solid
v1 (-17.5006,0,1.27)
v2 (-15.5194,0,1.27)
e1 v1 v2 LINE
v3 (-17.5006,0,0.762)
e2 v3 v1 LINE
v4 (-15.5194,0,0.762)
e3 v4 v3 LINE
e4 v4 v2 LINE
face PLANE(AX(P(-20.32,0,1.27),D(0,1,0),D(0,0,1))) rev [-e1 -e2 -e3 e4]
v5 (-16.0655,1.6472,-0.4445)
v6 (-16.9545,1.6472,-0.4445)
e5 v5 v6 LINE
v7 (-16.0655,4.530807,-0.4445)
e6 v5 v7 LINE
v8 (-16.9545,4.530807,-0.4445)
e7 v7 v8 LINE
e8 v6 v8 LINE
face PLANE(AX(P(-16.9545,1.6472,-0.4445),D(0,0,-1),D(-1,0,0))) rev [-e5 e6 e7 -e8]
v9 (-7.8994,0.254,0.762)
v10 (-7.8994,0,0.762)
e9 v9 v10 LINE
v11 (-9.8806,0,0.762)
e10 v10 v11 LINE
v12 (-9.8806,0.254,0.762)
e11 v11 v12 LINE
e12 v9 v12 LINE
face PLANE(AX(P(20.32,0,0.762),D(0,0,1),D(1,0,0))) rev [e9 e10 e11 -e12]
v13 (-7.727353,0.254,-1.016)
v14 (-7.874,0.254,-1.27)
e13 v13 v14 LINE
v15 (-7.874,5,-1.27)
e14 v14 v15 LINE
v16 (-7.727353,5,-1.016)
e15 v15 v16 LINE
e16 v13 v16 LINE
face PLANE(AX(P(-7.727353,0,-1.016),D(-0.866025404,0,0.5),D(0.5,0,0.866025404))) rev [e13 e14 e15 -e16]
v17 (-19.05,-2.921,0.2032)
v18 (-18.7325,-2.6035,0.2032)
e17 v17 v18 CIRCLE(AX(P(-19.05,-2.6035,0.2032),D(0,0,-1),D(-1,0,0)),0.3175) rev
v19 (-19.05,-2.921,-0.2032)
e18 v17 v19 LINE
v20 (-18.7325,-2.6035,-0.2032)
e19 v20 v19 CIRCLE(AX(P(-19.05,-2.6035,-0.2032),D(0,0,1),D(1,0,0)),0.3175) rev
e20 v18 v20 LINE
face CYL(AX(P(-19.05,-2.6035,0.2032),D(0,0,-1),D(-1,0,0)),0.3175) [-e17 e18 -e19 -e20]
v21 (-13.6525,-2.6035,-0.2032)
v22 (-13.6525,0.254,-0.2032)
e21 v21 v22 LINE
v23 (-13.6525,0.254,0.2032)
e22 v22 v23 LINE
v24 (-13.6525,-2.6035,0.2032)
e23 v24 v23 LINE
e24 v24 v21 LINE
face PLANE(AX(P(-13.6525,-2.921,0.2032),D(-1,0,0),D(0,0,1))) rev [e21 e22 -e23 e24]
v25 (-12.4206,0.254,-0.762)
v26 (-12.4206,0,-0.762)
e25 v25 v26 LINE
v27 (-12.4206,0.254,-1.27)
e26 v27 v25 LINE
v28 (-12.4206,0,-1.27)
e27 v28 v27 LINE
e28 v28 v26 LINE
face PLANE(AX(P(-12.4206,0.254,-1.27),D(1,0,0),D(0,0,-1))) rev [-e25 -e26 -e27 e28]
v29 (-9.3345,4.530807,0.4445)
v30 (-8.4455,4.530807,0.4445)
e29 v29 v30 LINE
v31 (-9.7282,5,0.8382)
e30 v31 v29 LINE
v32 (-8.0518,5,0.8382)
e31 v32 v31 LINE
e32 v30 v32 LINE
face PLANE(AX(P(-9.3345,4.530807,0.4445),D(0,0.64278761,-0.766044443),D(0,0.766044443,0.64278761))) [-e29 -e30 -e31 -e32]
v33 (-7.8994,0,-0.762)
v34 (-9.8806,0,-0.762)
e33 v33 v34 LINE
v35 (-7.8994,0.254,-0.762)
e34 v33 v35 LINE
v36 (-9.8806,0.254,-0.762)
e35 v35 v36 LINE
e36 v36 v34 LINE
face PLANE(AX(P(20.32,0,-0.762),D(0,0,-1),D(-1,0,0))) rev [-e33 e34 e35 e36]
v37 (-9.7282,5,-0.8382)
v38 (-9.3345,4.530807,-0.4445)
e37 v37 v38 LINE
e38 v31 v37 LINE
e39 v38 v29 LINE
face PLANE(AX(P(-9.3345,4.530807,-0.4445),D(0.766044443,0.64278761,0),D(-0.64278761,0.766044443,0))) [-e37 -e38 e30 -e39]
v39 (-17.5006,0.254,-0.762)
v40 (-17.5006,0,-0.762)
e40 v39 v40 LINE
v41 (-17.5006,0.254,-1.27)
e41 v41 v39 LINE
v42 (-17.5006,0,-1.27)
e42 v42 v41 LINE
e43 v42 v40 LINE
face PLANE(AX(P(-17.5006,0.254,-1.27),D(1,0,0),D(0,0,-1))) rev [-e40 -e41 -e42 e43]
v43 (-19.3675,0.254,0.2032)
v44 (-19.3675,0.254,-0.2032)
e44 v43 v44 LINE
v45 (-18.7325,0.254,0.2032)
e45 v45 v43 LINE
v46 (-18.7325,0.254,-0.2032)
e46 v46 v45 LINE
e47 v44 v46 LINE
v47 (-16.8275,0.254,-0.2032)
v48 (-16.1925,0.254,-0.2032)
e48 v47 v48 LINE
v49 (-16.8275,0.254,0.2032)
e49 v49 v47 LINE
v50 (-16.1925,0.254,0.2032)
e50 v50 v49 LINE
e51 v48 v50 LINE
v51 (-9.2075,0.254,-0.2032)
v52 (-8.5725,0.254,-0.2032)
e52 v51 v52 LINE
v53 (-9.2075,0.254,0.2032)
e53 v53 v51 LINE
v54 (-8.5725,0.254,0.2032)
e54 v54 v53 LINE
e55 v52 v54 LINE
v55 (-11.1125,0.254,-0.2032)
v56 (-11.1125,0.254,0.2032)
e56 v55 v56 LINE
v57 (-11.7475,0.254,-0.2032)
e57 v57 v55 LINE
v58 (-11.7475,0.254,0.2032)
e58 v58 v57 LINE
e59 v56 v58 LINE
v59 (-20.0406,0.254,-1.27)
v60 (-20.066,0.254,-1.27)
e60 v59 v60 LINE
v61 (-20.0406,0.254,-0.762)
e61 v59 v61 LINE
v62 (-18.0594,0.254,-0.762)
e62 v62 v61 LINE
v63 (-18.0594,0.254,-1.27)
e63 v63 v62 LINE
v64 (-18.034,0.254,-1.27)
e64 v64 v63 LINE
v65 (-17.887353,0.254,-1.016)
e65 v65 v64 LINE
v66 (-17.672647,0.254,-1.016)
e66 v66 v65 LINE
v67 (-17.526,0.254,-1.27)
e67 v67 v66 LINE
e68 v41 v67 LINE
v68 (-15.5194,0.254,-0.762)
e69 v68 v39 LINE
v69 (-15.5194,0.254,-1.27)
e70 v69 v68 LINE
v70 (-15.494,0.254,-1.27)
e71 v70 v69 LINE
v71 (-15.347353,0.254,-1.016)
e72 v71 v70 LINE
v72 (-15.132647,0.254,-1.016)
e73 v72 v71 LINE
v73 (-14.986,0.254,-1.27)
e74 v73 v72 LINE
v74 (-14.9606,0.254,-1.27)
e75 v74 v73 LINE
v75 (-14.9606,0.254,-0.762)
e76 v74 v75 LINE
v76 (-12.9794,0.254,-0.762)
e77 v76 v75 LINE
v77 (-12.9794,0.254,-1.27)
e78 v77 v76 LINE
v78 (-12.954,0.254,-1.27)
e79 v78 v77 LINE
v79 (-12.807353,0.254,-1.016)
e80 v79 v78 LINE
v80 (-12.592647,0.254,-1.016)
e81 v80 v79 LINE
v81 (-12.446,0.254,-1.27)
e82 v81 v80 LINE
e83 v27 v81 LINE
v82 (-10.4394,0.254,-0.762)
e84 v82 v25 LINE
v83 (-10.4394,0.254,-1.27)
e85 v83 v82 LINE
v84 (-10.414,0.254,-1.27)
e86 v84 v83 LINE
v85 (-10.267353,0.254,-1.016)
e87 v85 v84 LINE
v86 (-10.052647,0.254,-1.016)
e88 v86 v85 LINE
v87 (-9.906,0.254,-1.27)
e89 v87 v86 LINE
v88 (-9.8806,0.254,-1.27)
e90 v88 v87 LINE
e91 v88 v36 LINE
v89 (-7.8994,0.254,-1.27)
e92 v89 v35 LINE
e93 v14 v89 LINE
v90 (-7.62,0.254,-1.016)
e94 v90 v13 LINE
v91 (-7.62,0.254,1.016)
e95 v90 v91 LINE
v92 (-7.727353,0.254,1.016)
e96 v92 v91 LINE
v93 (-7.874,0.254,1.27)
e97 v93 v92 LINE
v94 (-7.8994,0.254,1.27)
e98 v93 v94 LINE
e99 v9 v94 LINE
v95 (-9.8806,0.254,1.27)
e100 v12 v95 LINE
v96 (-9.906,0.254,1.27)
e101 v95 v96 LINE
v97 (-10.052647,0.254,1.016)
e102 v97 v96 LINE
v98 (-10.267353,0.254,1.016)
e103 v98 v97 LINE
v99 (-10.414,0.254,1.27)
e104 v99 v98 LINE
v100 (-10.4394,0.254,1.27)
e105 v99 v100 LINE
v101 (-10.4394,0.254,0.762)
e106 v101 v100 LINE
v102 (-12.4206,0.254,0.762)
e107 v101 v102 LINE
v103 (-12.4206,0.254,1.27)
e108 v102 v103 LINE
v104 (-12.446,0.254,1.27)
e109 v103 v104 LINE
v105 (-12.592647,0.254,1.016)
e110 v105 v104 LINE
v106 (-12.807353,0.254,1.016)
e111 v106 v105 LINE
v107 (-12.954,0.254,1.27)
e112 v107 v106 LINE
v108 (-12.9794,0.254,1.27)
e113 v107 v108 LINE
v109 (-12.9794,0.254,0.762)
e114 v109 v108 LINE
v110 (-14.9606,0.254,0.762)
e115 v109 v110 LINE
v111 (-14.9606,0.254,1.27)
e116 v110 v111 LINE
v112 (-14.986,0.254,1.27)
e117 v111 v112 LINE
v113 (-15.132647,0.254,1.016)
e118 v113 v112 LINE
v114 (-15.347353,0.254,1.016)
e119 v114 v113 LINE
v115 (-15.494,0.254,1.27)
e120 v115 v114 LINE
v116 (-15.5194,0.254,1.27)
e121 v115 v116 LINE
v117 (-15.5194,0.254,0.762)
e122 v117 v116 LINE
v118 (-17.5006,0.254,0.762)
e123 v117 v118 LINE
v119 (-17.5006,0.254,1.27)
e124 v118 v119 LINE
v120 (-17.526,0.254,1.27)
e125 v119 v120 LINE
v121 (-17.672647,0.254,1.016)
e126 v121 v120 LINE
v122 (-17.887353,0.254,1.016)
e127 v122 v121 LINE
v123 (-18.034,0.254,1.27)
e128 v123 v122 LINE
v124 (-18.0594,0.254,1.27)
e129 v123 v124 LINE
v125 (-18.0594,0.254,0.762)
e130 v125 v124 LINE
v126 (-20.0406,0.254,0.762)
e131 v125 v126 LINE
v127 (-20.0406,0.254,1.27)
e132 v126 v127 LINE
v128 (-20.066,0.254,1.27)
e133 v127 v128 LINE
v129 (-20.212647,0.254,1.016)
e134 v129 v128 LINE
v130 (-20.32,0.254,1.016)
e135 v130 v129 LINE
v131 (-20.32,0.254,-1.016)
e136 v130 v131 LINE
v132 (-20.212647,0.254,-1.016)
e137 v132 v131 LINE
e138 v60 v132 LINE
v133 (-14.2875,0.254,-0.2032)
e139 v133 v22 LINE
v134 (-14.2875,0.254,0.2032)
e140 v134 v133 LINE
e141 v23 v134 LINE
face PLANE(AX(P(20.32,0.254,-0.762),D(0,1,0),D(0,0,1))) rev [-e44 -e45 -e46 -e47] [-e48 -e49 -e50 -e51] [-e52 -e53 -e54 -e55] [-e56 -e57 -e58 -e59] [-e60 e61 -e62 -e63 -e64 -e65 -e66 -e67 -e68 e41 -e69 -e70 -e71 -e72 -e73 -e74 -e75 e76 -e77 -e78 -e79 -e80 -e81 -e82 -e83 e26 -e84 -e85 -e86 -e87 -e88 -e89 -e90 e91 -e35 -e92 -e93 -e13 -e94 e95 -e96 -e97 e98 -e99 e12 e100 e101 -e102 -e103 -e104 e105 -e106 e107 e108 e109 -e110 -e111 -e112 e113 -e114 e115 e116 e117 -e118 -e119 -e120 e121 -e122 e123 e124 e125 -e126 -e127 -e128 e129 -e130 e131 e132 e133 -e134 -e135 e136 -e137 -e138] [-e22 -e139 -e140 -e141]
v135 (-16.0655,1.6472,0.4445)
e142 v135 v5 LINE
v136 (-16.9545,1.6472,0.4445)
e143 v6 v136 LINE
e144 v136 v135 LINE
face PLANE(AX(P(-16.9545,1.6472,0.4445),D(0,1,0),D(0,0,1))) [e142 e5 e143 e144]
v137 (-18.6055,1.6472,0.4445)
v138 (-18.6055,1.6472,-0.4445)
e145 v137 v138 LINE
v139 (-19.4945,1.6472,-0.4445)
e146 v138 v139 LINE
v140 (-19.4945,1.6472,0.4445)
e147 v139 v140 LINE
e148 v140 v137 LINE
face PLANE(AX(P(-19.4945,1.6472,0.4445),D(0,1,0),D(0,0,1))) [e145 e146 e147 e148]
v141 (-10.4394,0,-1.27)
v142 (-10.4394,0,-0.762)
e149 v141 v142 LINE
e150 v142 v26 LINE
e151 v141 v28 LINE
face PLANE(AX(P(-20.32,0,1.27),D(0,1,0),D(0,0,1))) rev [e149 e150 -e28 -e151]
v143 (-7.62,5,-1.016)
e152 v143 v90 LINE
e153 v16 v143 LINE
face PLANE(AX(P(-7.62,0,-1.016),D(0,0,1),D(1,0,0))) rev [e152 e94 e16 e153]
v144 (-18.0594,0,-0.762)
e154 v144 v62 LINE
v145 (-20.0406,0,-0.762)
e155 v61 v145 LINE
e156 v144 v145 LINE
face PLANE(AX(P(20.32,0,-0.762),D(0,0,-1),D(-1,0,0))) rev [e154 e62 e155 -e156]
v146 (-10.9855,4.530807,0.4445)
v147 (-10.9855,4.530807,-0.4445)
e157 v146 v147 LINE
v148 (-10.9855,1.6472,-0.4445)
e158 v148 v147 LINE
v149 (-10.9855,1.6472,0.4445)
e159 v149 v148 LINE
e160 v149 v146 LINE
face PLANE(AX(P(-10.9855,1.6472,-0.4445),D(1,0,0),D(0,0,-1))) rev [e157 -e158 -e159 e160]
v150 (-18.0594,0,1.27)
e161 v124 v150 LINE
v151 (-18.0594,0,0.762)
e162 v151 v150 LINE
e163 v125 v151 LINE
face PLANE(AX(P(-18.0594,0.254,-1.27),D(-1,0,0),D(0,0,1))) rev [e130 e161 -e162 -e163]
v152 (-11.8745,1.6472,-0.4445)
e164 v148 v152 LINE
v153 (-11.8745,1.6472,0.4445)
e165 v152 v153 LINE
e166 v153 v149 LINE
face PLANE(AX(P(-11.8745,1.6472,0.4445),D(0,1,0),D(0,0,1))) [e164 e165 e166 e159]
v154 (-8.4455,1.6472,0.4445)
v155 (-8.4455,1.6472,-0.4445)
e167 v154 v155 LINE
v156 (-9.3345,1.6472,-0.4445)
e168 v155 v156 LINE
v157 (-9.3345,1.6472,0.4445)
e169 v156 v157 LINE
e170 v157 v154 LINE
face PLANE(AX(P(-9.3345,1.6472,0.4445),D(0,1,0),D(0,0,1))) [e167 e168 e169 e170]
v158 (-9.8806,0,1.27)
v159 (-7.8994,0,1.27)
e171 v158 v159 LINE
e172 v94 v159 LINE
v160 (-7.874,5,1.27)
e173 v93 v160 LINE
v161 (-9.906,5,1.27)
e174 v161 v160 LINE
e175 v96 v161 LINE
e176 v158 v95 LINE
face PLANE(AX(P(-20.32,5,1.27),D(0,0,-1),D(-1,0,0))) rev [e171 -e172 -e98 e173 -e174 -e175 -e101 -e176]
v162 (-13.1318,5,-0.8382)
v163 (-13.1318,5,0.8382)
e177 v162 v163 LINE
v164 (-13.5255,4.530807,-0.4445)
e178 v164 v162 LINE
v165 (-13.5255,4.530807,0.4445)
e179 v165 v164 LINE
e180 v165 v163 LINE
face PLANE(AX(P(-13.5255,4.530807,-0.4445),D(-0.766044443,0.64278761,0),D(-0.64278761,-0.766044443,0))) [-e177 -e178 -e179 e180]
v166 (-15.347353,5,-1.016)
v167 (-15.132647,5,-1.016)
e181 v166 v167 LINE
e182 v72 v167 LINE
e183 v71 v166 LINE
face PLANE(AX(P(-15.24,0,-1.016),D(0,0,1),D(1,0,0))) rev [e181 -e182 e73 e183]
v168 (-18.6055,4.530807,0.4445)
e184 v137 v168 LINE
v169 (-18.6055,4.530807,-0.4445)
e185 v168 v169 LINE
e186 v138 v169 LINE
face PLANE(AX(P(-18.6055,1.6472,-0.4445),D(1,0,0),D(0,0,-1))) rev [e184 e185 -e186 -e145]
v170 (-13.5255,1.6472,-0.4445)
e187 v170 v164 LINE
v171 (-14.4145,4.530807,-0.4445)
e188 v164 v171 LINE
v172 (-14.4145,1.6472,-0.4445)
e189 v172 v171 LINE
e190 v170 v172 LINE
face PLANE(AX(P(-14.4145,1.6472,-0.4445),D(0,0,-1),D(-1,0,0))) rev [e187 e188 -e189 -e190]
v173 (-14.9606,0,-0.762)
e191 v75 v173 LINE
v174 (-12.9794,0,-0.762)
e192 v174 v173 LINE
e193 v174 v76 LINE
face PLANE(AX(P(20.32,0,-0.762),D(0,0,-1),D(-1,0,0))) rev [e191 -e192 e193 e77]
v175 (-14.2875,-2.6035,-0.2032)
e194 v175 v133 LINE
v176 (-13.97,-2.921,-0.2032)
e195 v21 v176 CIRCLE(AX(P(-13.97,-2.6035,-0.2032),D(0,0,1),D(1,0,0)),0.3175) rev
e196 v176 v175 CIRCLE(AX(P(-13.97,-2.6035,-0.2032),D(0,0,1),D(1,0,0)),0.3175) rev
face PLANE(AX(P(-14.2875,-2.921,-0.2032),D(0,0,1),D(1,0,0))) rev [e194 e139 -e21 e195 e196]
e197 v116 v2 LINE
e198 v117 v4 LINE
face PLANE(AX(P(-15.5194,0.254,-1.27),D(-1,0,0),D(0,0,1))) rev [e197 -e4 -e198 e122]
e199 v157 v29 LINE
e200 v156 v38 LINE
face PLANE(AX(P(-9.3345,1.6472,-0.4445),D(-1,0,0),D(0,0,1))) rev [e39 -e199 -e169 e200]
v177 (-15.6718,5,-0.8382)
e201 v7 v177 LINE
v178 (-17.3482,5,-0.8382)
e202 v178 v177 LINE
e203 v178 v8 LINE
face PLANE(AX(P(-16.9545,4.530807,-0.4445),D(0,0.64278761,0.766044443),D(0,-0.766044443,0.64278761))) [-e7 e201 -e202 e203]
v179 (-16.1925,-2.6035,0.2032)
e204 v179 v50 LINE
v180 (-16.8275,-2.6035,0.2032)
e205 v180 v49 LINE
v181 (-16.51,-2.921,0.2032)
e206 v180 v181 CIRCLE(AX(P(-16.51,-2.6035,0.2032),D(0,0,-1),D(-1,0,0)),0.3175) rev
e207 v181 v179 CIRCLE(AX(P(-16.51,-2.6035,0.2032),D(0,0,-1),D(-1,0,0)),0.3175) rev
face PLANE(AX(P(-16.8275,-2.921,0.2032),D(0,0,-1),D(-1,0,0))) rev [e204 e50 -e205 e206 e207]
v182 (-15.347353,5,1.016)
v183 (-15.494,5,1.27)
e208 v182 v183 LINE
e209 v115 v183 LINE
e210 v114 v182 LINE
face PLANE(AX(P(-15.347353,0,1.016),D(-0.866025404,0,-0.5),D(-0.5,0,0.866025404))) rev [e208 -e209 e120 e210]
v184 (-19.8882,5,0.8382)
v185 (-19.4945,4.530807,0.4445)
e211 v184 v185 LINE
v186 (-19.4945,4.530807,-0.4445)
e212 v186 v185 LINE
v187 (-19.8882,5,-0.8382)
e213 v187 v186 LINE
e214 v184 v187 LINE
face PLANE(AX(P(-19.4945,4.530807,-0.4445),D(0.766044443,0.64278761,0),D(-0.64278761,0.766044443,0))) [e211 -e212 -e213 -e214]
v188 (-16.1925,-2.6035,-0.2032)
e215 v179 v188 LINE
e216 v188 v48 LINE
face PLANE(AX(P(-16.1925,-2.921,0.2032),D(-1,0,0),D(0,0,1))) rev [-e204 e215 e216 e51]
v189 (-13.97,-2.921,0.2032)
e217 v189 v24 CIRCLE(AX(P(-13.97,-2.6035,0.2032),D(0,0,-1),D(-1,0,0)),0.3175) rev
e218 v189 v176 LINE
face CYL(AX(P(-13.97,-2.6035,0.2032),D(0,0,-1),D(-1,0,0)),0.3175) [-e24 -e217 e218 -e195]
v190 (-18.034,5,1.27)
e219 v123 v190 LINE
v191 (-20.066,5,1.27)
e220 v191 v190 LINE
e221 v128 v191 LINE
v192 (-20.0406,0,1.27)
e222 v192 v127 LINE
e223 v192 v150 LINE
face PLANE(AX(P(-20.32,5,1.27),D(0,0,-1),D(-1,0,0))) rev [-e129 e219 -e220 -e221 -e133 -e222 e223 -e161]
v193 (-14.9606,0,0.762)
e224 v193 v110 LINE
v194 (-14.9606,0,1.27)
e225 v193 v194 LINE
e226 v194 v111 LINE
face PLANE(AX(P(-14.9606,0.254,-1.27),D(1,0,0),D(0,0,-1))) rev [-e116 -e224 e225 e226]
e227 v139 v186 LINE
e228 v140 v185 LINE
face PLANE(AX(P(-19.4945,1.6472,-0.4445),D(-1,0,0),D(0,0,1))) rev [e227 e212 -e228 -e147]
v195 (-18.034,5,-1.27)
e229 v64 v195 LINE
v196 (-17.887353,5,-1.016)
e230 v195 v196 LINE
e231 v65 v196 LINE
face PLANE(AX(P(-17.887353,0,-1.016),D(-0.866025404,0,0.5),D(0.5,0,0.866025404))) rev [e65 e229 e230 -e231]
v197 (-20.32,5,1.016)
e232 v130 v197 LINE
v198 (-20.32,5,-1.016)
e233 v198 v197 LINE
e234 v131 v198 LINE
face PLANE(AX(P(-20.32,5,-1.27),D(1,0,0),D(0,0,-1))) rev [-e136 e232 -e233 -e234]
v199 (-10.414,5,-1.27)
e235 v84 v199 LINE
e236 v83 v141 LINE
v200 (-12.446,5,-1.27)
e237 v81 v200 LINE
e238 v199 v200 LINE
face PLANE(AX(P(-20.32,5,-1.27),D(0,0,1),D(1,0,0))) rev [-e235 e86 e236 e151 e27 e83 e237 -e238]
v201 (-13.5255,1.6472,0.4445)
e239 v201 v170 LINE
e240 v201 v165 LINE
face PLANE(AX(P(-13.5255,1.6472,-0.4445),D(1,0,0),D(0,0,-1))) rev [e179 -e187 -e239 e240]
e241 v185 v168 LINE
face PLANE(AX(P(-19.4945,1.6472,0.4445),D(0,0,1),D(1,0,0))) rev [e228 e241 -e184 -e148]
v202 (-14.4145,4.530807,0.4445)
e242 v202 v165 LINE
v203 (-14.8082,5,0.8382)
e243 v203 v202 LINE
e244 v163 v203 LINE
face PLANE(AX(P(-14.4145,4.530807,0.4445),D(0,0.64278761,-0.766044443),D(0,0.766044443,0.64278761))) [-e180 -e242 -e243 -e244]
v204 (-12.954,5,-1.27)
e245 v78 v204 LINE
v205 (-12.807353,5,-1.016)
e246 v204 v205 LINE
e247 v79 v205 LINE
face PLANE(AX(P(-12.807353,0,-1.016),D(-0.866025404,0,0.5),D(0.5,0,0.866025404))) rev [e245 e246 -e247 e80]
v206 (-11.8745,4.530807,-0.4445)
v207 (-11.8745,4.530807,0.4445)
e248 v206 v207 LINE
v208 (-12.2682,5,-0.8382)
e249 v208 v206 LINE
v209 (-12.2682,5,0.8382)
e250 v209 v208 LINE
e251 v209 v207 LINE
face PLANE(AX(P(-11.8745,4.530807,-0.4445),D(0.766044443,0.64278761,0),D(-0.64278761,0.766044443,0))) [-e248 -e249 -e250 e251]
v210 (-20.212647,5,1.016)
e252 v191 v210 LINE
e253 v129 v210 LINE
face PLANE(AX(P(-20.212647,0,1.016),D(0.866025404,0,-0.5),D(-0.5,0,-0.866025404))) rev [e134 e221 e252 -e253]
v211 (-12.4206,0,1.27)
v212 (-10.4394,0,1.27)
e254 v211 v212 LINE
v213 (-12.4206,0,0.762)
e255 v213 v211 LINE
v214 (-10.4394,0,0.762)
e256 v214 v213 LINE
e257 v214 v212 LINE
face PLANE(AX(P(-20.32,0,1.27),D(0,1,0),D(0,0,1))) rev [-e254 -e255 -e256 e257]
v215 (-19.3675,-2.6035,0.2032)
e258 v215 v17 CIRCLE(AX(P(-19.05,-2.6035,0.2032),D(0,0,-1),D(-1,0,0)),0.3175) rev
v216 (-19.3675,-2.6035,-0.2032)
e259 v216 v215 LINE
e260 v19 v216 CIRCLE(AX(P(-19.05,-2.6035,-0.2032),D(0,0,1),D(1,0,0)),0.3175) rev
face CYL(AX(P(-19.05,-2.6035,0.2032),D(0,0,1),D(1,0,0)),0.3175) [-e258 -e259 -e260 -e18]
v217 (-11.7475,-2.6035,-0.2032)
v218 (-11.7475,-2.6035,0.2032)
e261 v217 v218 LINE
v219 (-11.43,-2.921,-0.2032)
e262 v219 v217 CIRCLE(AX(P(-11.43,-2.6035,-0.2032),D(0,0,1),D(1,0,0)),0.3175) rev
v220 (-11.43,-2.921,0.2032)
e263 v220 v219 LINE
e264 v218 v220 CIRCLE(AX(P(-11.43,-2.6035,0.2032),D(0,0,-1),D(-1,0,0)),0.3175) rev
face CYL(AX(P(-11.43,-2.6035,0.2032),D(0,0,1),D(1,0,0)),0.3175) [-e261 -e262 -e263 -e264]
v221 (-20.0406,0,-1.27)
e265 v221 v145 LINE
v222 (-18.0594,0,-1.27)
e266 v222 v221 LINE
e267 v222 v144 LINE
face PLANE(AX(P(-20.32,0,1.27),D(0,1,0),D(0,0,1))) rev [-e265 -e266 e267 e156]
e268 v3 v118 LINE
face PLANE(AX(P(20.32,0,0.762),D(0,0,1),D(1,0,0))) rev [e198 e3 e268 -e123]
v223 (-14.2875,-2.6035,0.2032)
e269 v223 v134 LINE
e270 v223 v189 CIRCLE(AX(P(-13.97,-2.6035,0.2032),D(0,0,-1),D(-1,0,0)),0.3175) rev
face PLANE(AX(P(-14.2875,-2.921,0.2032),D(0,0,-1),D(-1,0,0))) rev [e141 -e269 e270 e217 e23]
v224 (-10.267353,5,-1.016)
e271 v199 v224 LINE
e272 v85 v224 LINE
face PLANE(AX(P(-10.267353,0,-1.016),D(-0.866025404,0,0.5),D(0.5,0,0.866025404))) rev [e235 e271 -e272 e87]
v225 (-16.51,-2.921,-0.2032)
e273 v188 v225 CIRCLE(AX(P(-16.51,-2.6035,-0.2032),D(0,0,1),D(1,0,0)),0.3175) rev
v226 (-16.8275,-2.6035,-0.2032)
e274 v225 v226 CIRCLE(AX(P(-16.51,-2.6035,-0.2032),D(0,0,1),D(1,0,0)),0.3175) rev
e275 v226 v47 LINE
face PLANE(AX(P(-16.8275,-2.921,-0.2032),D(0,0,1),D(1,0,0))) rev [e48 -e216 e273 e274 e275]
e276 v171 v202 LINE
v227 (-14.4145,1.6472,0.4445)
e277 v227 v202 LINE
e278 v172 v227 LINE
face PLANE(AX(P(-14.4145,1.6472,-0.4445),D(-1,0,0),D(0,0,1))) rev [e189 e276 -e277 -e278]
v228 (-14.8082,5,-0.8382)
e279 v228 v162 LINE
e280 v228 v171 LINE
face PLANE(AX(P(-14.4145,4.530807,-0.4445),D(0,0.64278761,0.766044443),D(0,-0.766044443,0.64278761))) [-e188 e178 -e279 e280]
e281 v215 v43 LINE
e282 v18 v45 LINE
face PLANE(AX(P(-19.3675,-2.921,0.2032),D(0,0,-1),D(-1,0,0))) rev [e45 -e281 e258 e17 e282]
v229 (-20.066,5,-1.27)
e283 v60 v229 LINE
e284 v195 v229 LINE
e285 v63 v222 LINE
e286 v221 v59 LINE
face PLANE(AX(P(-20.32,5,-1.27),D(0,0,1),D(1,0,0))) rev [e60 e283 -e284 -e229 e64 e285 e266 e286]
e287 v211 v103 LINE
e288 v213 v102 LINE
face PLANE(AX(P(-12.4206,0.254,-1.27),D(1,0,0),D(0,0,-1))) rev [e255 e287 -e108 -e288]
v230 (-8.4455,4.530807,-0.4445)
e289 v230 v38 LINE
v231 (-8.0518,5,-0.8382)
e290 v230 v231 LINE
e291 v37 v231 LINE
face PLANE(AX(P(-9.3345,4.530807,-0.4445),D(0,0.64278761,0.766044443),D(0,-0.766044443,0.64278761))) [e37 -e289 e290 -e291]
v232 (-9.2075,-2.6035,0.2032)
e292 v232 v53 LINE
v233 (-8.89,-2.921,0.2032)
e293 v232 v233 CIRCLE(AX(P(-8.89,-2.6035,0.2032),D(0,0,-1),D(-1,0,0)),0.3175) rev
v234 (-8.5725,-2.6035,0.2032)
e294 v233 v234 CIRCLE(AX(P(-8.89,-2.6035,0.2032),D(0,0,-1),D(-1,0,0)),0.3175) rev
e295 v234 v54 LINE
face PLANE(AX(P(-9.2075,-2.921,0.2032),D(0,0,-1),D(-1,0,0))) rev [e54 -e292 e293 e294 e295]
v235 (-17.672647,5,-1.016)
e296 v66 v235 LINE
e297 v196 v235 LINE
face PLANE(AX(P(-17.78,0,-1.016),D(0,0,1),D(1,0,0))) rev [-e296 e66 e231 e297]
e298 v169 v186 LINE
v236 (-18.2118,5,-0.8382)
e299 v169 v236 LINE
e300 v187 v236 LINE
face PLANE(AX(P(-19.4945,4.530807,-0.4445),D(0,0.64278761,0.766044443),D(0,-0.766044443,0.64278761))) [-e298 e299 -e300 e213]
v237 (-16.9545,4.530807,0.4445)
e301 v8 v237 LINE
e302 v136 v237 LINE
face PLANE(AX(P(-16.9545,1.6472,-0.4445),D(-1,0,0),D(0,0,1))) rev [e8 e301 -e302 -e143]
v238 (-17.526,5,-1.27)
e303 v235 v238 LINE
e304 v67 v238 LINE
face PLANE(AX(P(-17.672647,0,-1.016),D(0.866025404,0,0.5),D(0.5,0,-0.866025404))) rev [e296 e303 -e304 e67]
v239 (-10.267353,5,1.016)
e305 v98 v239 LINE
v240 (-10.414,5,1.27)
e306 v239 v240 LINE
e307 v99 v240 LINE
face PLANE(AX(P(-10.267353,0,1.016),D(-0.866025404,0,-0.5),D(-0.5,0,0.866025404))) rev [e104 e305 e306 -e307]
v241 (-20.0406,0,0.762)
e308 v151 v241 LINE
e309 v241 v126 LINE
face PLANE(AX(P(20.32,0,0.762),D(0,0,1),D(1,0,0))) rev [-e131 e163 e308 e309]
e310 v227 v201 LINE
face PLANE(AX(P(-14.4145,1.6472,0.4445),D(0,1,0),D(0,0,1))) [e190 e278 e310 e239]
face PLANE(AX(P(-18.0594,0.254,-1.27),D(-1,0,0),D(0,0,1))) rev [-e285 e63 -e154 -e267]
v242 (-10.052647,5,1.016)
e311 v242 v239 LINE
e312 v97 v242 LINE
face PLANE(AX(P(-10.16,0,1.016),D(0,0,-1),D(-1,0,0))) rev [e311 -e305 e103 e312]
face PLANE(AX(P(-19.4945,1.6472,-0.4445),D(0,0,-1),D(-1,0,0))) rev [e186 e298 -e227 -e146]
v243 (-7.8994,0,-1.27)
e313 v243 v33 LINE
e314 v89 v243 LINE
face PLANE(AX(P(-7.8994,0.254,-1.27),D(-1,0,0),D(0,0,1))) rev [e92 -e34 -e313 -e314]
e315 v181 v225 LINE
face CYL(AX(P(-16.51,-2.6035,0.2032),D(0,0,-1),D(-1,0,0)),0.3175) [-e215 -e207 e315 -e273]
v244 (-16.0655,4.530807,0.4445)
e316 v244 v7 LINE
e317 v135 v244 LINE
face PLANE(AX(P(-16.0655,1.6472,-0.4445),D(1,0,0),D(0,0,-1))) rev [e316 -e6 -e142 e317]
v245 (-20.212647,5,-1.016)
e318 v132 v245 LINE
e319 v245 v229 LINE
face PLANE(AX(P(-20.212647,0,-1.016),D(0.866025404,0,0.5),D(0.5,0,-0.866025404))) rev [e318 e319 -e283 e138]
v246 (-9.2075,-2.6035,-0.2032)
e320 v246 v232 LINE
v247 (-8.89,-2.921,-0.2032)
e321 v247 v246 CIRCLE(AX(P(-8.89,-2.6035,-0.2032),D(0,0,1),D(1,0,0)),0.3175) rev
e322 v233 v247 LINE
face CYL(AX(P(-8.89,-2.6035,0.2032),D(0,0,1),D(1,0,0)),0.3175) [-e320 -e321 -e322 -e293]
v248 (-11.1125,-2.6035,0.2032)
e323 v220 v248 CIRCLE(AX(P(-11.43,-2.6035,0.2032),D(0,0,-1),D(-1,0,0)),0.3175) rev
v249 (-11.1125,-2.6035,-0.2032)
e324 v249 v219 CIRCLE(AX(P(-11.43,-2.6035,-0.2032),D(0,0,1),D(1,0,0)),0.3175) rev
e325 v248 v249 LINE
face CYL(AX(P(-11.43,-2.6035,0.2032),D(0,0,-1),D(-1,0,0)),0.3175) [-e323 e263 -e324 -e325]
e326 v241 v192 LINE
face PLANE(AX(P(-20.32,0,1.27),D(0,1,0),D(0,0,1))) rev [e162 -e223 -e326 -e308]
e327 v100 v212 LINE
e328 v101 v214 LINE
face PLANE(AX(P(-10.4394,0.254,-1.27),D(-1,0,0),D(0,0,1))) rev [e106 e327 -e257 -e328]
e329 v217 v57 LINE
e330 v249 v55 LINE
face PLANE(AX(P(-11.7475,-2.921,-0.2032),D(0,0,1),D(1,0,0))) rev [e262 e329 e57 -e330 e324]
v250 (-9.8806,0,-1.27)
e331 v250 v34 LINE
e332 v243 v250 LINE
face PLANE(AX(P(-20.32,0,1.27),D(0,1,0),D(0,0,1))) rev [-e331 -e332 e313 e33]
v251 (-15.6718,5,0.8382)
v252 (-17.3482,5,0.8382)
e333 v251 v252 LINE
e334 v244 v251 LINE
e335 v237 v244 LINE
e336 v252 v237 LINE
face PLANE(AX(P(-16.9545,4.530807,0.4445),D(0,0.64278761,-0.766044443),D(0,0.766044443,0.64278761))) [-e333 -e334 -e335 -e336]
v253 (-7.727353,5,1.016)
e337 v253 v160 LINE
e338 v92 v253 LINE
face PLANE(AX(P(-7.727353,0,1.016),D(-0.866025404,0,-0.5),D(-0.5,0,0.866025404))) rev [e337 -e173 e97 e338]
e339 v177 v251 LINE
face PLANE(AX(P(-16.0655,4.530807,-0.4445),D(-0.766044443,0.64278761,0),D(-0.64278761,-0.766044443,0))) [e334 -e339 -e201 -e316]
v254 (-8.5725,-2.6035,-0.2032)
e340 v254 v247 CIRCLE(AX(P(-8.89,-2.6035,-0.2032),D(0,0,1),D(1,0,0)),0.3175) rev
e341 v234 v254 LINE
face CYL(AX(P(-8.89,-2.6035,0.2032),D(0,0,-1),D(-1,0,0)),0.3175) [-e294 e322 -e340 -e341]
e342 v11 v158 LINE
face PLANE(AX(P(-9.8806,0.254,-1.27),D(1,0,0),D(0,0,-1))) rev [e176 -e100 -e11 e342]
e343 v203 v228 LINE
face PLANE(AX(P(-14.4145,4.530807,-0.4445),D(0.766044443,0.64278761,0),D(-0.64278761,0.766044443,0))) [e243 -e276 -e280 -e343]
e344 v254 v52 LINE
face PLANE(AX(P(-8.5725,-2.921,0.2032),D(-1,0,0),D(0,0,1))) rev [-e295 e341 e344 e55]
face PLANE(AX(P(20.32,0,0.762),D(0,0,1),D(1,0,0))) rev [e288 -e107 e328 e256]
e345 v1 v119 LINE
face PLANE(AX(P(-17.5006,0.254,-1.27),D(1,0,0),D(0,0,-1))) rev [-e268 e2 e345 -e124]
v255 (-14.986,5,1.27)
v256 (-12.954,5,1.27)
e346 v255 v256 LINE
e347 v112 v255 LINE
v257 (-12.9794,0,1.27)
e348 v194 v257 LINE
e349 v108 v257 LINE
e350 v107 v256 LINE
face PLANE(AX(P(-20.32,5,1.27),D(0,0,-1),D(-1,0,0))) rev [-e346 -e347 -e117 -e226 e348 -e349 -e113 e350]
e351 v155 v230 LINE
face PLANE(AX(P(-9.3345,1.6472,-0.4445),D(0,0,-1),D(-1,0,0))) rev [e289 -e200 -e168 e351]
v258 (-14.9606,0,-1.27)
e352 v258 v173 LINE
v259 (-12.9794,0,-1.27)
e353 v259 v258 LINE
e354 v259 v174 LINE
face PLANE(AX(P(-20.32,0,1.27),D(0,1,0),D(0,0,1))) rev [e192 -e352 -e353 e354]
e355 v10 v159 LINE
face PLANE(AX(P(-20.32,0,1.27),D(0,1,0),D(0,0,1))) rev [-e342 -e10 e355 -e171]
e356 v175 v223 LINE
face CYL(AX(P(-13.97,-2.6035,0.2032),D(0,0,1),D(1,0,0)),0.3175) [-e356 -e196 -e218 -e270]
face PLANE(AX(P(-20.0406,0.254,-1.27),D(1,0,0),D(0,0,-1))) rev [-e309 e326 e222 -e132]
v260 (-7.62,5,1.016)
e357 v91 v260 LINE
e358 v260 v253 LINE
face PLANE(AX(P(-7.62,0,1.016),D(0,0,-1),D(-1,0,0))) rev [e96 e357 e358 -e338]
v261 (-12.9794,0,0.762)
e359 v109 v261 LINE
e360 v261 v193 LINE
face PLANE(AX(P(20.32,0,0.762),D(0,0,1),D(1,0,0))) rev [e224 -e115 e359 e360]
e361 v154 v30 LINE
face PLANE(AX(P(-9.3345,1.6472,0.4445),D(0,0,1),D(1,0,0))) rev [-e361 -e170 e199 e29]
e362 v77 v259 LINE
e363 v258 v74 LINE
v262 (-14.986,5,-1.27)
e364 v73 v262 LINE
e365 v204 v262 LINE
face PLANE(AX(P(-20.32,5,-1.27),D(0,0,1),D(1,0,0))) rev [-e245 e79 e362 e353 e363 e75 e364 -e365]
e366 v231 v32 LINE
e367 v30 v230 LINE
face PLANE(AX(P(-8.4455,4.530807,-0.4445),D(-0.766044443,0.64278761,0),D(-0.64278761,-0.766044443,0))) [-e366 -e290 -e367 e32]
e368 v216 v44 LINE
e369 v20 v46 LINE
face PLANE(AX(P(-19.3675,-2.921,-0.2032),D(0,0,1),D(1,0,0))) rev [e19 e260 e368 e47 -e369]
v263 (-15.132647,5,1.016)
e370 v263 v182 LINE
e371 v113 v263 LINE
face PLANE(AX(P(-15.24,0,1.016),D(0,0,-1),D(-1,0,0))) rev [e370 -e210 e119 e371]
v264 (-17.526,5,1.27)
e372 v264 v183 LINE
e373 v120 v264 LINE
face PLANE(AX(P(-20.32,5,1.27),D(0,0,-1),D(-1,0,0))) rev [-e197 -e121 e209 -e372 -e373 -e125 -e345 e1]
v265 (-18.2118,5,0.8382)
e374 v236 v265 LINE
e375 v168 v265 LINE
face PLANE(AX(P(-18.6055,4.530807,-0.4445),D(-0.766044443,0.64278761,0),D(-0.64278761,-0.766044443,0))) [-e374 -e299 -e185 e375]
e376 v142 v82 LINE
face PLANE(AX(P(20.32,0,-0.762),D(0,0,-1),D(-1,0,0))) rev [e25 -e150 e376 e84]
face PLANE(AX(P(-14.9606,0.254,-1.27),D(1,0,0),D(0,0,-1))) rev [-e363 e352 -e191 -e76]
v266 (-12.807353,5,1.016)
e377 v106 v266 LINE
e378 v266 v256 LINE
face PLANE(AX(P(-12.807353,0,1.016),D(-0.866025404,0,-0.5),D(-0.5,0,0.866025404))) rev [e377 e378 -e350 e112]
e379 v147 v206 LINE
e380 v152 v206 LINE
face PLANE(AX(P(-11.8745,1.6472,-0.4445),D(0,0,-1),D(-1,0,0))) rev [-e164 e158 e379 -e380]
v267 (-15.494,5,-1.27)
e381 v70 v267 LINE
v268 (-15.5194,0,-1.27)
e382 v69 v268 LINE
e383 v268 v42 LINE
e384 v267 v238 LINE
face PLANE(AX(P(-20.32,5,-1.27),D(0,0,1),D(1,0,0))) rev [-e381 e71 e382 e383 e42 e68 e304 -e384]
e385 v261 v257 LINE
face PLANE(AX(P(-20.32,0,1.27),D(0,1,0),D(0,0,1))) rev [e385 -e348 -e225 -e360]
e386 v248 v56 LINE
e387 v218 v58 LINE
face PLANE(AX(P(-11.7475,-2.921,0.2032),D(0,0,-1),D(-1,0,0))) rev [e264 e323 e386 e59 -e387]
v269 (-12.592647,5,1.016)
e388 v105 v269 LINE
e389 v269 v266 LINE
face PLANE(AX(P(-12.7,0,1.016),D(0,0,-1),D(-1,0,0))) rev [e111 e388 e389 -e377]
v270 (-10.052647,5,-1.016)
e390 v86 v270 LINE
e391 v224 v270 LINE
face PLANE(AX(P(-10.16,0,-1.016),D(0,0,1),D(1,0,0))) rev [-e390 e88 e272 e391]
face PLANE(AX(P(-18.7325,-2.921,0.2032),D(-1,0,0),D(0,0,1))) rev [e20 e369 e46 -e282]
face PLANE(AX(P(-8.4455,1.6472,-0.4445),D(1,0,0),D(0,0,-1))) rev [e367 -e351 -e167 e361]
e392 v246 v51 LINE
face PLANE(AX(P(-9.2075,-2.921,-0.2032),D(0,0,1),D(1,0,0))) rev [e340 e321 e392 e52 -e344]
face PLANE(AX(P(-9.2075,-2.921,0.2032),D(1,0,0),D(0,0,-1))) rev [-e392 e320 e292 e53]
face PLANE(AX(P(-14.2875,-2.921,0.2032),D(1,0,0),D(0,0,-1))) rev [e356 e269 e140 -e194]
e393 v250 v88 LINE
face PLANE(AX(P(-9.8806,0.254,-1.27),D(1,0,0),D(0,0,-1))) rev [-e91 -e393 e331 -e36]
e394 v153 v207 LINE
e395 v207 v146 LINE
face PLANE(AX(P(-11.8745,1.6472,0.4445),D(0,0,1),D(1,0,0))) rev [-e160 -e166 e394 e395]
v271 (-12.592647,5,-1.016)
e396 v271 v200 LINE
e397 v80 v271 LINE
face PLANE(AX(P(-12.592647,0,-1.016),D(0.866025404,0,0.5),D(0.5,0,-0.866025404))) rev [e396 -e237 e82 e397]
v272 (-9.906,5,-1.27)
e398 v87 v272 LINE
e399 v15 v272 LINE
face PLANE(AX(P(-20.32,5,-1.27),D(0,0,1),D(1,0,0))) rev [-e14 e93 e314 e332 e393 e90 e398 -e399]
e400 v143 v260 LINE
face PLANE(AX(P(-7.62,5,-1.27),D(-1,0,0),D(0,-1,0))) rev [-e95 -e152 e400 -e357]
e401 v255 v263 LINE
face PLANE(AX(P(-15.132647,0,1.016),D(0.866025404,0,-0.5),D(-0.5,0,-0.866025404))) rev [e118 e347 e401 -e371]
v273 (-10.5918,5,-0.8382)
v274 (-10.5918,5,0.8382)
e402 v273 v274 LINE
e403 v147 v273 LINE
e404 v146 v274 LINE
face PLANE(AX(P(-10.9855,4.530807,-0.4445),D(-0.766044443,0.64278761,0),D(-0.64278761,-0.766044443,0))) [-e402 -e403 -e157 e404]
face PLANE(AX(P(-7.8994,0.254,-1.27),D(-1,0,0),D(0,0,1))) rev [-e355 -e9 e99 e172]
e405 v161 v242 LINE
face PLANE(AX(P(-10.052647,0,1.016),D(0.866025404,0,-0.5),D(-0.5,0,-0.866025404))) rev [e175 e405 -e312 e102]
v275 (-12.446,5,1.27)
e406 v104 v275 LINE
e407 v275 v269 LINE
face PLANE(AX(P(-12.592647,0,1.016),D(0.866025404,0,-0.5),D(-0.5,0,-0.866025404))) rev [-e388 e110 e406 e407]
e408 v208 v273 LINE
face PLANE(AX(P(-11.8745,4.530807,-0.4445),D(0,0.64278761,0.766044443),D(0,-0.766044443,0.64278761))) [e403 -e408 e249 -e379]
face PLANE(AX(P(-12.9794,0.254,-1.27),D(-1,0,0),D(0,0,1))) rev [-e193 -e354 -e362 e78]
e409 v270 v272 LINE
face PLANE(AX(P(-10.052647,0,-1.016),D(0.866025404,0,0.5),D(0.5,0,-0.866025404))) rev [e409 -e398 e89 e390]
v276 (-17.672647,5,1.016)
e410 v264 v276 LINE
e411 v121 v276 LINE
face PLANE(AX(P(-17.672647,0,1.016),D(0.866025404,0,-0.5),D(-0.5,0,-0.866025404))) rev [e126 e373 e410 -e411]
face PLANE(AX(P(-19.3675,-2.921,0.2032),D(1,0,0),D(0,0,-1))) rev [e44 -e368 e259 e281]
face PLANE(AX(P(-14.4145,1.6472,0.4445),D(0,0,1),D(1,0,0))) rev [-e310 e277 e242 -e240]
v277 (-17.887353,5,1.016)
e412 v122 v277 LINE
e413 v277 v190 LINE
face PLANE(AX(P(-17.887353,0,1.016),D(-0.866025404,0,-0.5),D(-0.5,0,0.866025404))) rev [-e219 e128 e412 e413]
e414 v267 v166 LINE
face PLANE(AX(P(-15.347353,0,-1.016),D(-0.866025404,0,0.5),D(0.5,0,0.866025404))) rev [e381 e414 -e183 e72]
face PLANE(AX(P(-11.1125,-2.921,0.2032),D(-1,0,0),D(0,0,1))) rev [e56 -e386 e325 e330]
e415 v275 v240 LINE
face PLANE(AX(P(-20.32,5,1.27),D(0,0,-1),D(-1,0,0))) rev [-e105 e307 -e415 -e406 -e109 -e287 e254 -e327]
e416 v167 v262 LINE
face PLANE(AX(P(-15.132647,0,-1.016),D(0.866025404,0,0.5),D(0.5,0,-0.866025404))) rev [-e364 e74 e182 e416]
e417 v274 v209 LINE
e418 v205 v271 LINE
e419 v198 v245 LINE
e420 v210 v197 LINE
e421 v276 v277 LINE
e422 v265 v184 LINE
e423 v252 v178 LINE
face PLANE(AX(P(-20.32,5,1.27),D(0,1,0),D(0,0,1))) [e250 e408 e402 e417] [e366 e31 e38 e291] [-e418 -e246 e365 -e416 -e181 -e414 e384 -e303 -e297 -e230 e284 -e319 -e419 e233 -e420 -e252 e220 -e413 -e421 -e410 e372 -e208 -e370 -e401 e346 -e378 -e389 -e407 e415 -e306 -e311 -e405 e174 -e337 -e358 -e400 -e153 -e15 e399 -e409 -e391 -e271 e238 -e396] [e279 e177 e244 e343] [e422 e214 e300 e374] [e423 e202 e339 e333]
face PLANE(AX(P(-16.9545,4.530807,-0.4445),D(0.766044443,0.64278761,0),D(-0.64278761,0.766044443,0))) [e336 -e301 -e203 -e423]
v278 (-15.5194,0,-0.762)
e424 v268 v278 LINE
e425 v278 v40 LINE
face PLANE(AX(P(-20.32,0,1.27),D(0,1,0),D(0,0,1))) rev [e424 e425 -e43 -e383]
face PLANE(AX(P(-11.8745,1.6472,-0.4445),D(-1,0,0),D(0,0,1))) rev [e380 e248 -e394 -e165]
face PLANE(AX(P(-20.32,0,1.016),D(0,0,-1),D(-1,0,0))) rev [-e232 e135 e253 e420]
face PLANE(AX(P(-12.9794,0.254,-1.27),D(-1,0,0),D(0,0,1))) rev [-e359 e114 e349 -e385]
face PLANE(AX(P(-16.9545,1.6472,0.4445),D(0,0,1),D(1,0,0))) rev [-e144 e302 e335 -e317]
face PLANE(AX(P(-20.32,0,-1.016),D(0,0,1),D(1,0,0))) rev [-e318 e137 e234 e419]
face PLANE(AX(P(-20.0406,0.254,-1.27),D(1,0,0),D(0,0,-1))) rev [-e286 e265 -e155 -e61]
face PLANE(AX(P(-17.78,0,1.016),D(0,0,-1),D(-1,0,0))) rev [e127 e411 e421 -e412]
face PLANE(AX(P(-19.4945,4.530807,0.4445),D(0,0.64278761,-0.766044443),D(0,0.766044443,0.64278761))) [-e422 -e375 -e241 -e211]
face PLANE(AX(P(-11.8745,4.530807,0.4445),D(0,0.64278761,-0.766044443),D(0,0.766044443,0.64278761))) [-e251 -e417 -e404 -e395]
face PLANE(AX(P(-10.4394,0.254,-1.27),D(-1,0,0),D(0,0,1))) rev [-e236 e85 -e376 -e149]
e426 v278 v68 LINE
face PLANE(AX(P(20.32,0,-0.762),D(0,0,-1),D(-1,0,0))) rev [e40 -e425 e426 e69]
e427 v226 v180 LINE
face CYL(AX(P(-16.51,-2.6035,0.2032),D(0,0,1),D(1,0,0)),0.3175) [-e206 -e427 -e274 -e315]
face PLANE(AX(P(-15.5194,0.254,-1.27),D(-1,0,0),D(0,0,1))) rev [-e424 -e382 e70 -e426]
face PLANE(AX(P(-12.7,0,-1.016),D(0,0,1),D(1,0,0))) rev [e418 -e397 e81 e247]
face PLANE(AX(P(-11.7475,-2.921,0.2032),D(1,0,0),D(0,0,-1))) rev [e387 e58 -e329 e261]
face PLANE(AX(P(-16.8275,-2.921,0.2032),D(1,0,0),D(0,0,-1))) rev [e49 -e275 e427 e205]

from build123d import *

# Parameters (mm, degrees)
SKETCH1_W                      = 40.64
SKETCH1_H                      = 2.54
BASE_EXTRUDE_DEPTH             = 5
SKETCH2_W                      = 1.524
SKETCH2_H                      = 0.254
STANDOFF_WIDTH_DEPTH           = 41.966114046
UPPER_START                    = -19.4945
UPPER_CORE_OUTLINE_W           = 3.3528
UPPER_CORE_OUTLINE_H           = 0.889
UPPER_CORE_DEPTH               = 0.889
LEAD_IN_SIZE                   = 0.3937
LEAD_IN_SIZE2                  = 0.469193389
CORE_PATTERN_COUNT             = 16
CORE_PATTERN_PITCH             = 2.54
LEAD_IN_OF_CORE_PATTERN_SIZE2  = 0.469193389
LEAD_IN_OF_CORE_PATTERN_SIZE   = 0.3937
POSITION_CUT_DEPTH             = 21.964620197
SKETCH10_W                     = 0.2794
SKETCH10_H                     = 0.254
STANDOFF_LENGTH_DEPTH          = 22.07970588
STANDOFF_PATTERN_COUNT         = 16
STANDOFF_PATTERN_PITCH         = 2.54
SKETCH11_W                     = 0.635
SKETCH11_H                     = 0.4064
TAIL_DEPTH                     = 3.175
TAIL_FILLETS_R                 = 0.3175
TAIL_PATTERN_COUNT             = 16
TAIL_PATTERN_PITCH             = 2.54
TAIL_FILLETS_OF_TAIL_PATTERN_R = 0.3175
SKETCH12_W                     = 27.94
SKETCH12_H                     = 7.921
CUT_EXTRUDE1_DEPTH             = 22.07970588


# Read off the part's stored shape, not the designer's step: Upper Core
with BuildPart() as part:
    # Sketch1 → Base-Extrude (new body)
    with BuildSketch(Plane(origin=(0, 0, 0), x_dir=(1, 0, 0), z_dir=(0, 1, 0))):
        Rectangle(SKETCH1_W, SKETCH1_H)
    extrude(amount=BASE_EXTRUDE_DEPTH)

    # Sketch2 → Standoff - Width (cut, through all)
    with BuildSketch(Plane.ZY.offset(20.32)):
        with Locations((0, 0.127)):
            Rectangle(SKETCH2_W, SKETCH2_H)
    extrude(amount=-STANDOFF_WIDTH_DEPTH, mode=Mode.SUBTRACT)

    # Upper Core outline → Upper Core (cut)
    with BuildSketch(Plane.YZ.offset(UPPER_START)):
        with Locations((3.3236, 0)):
            Rectangle(UPPER_CORE_OUTLINE_W, UPPER_CORE_OUTLINE_H)
    upper_core = extrude(amount=UPPER_CORE_DEPTH, mode=Mode.SUBTRACT)

    # Lead-in
    lead_in_edges = [part.edges().sort_by_distance(p)[0] for p in [
        (-19.4945, 5, 0),
        (-19.05, 5, 0.4445),
        (-18.6055, 5, 0),
        (-19.05, 5, -0.4445),
    ]]
    lead_in_side = [part.faces().sort_by_distance(p)[0] for p in [
        (0.146976854, 5, 0),
    ]]
    chamfer(lead_in_edges, length=LEAD_IN_SIZE, length2=LEAD_IN_SIZE2, reference=lead_in_side[0])

    # Core Pattern: Upper Core ×16
    with Locations(*[(i * CORE_PATTERN_PITCH, 0, 0) for i in range(1, CORE_PATTERN_COUNT)]):
        add(upper_core, mode=Mode.SUBTRACT)

    # Lead-in of Core Pattern
    lead_in_of_core_pattern_edges = [part.edges().sort_by_distance(p)[0] for p in [
        (-16.9545, 5, 0),
        (-16.51, 5, 0.4445),
        (-16.0655, 5, 0),
        (-16.51, 5, -0.4445),
        (-14.4145, 5, 0),
        (-13.97, 5, 0.4445),
        (-13.5255, 5, 0),
        (-13.97, 5, -0.4445),
        (-11.8745, 5, 0),
        (-11.43, 5, 0.4445),
        (-10.9855, 5, 0),
        (-11.43, 5, -0.4445),
        (-9.3345, 5, 0),
        (-8.89, 5, 0.4445),
        (-8.4455, 5, 0),
        (-8.89, 5, -0.4445),
        (-6.7945, 5, 0),
        (-6.35, 5, 0.4445),
        (-5.9055, 5, 0),
        (-6.35, 5, -0.4445),
        (-4.2545, 5, 0),
        (-3.81, 5, 0.4445),
        (-3.3655, 5, 0),
        (-3.81, 5, -0.4445),
        (-1.7145, 5, 0),
        (-1.27, 5, 0.4445),
        (-0.8255, 5, 0),
        (-1.27, 5, -0.4445),
        (0.8255, 5, 0),
        (1.27, 5, 0.4445),
        (1.7145, 5, 0),
        (1.27, 5, -0.4445),
        (3.3655, 5, 0),
        (3.81, 5, 0.4445),
        (4.2545, 5, 0),
        (3.81, 5, -0.4445),
        (5.9055, 5, 0),
        (6.35, 5, 0.4445),
        (6.7945, 5, 0),
        (6.35, 5, -0.4445),
        (8.4455, 5, 0),
        (8.89, 5, 0.4445),
        (9.3345, 5, 0),
        (8.89, 5, -0.4445),
        (10.9855, 5, 0),
        (11.43, 5, 0.4445),
        (11.8745, 5, 0),
        (11.43, 5, -0.4445),
        (13.5255, 5, 0),
        (13.97, 5, 0.4445),
        (14.4145, 5, 0),
        (13.97, 5, -0.4445),
        (16.0655, 5, 0),
        (16.51, 5, 0.4445),
        (16.9545, 5, 0),
        (16.51, 5, -0.4445),
        (18.6055, 5, 0),
        (19.05, 5, 0.4445),
        (19.4945, 5, 0),
        (19.05, 5, -0.4445),
    ]]
    chamfer(lead_in_of_core_pattern_edges, length=LEAD_IN_OF_CORE_PATTERN_SIZE, length2=LEAD_IN_OF_CORE_PATTERN_SIZE2)

    # Sketch4 → Position Cut (cut, through all)
    with BuildSketch(Plane(origin=(0, 5, 0), x_dir=(-1, 0, 0), z_dir=(0, 1, 0))):
        Polygon((20.32, 1.016), (20.212646968, 1.016), (20.066, 1.27), (20.32, 1.27), align=None)
        Polygon((20.066, -1.27), (20.32, -1.27), (20.32, -1.016), (20.212646968, -1.016), align=None)
        Polygon((17.78, -1.016), (17.887353032, -1.016), (18.034, -1.27), (17.78, -1.27), align=None)
        Polygon((18.034, 1.27), (17.78, 1.27), (17.78, 1.016), (17.887353032, 1.016), align=None)
    position_cut = extrude(amount=-POSITION_CUT_DEPTH, mode=Mode.SUBTRACT)

    # Sketch10 → Standoff - Length (cut, through all)
    with BuildSketch(Plane.XY.offset(1.27)):
        with Locations((-17.9197, 0.127)):
            Rectangle(SKETCH10_W, SKETCH10_H)
        with Locations((-20.1803, 0.127)):
            Rectangle(SKETCH10_W, SKETCH10_H)
    standoff_length = extrude(amount=-STANDOFF_LENGTH_DEPTH, mode=Mode.SUBTRACT)

    # Standoff Pattern: Position Cut, Standoff - Length ×16
    with Locations(*[(i * STANDOFF_PATTERN_PITCH, 0, 0) for i in range(1, STANDOFF_PATTERN_COUNT)]):
        add(position_cut, mode=Mode.SUBTRACT)
        add(standoff_length, mode=Mode.SUBTRACT)

    # Sketch11 → Tail (add)
    with BuildSketch(Plane.XZ.offset(-0.254)):
        with Locations((-19.05, 0)):
            Rectangle(SKETCH11_W, SKETCH11_H)
    tail = extrude(amount=TAIL_DEPTH)

    # Tail Fillets
    tail_fillets_edges = [part.edges().sort_by_distance(p)[0] for p in [
        (-19.3675, -2.921, 0),
        (-18.7325, -2.921, 0),
    ]]
    fillet(tail_fillets_edges, radius=TAIL_FILLETS_R - 0.0001)  # a hair under: the kernel refuses the full size

    # Tail Pattern: Tail ×16
    with Locations(*[(i * TAIL_PATTERN_PITCH, 0, 0) for i in range(1, TAIL_PATTERN_COUNT)]):
        add(tail)

    # Tail Fillets of Tail Pattern
    tail_fillets_of_tail_pattern_edges = [part.edges().sort_by_distance(p)[0] for p in [
        (-16.8275, -2.921, 0),
        (-16.1925, -2.921, 0),
        (-14.2875, -2.921, 0),
        (-13.6525, -2.921, 0),
        (-11.7475, -2.921, 0),
        (-11.1125, -2.921, 0),
        (-9.2075, -2.921, 0),
        (-8.5725, -2.921, 0),
        (-6.6675, -2.921, 0),
        (-6.0325, -2.921, 0),
        (-4.1275, -2.921, 0),
        (-3.4925, -2.921, 0),
        (-1.5875, -2.921, 0),
        (-0.9525, -2.921, 0),
        (0.9525, -2.921, 0),
        (1.5875, -2.921, 0),
        (3.4925, -2.921, 0),
        (4.1275, -2.921, 0),
        (6.0325, -2.921, 0),
        (6.6675, -2.921, 0),
        (8.5725, -2.921, 0),
        (9.2075, -2.921, 0),
        (11.1125, -2.921, 0),
        (11.7475, -2.921, 0),
        (13.6525, -2.921, 0),
        (14.2875, -2.921, 0),
        (16.1925, -2.921, 0),
        (16.8275, -2.921, 0),
        (18.7325, -2.921, 0),
        (19.3675, -2.921, 0),
    ]]
    fillet(tail_fillets_of_tail_pattern_edges, radius=TAIL_FILLETS_OF_TAIL_PATTERN_R - 0.0001)  # a hair under: the kernel refuses the full size

    # Sketch12 → Cut-Extrude1 (cut, through all)
    with BuildSketch(Plane.XY.offset(1.27)):
        with Locations((6.35, 1.0395)):
            Rectangle(SKETCH12_W, SKETCH12_H)
    extrude(amount=-CUT_EXTRUDE1_DEPTH, mode=Mode.SUBTRACT)


solid = part.part
